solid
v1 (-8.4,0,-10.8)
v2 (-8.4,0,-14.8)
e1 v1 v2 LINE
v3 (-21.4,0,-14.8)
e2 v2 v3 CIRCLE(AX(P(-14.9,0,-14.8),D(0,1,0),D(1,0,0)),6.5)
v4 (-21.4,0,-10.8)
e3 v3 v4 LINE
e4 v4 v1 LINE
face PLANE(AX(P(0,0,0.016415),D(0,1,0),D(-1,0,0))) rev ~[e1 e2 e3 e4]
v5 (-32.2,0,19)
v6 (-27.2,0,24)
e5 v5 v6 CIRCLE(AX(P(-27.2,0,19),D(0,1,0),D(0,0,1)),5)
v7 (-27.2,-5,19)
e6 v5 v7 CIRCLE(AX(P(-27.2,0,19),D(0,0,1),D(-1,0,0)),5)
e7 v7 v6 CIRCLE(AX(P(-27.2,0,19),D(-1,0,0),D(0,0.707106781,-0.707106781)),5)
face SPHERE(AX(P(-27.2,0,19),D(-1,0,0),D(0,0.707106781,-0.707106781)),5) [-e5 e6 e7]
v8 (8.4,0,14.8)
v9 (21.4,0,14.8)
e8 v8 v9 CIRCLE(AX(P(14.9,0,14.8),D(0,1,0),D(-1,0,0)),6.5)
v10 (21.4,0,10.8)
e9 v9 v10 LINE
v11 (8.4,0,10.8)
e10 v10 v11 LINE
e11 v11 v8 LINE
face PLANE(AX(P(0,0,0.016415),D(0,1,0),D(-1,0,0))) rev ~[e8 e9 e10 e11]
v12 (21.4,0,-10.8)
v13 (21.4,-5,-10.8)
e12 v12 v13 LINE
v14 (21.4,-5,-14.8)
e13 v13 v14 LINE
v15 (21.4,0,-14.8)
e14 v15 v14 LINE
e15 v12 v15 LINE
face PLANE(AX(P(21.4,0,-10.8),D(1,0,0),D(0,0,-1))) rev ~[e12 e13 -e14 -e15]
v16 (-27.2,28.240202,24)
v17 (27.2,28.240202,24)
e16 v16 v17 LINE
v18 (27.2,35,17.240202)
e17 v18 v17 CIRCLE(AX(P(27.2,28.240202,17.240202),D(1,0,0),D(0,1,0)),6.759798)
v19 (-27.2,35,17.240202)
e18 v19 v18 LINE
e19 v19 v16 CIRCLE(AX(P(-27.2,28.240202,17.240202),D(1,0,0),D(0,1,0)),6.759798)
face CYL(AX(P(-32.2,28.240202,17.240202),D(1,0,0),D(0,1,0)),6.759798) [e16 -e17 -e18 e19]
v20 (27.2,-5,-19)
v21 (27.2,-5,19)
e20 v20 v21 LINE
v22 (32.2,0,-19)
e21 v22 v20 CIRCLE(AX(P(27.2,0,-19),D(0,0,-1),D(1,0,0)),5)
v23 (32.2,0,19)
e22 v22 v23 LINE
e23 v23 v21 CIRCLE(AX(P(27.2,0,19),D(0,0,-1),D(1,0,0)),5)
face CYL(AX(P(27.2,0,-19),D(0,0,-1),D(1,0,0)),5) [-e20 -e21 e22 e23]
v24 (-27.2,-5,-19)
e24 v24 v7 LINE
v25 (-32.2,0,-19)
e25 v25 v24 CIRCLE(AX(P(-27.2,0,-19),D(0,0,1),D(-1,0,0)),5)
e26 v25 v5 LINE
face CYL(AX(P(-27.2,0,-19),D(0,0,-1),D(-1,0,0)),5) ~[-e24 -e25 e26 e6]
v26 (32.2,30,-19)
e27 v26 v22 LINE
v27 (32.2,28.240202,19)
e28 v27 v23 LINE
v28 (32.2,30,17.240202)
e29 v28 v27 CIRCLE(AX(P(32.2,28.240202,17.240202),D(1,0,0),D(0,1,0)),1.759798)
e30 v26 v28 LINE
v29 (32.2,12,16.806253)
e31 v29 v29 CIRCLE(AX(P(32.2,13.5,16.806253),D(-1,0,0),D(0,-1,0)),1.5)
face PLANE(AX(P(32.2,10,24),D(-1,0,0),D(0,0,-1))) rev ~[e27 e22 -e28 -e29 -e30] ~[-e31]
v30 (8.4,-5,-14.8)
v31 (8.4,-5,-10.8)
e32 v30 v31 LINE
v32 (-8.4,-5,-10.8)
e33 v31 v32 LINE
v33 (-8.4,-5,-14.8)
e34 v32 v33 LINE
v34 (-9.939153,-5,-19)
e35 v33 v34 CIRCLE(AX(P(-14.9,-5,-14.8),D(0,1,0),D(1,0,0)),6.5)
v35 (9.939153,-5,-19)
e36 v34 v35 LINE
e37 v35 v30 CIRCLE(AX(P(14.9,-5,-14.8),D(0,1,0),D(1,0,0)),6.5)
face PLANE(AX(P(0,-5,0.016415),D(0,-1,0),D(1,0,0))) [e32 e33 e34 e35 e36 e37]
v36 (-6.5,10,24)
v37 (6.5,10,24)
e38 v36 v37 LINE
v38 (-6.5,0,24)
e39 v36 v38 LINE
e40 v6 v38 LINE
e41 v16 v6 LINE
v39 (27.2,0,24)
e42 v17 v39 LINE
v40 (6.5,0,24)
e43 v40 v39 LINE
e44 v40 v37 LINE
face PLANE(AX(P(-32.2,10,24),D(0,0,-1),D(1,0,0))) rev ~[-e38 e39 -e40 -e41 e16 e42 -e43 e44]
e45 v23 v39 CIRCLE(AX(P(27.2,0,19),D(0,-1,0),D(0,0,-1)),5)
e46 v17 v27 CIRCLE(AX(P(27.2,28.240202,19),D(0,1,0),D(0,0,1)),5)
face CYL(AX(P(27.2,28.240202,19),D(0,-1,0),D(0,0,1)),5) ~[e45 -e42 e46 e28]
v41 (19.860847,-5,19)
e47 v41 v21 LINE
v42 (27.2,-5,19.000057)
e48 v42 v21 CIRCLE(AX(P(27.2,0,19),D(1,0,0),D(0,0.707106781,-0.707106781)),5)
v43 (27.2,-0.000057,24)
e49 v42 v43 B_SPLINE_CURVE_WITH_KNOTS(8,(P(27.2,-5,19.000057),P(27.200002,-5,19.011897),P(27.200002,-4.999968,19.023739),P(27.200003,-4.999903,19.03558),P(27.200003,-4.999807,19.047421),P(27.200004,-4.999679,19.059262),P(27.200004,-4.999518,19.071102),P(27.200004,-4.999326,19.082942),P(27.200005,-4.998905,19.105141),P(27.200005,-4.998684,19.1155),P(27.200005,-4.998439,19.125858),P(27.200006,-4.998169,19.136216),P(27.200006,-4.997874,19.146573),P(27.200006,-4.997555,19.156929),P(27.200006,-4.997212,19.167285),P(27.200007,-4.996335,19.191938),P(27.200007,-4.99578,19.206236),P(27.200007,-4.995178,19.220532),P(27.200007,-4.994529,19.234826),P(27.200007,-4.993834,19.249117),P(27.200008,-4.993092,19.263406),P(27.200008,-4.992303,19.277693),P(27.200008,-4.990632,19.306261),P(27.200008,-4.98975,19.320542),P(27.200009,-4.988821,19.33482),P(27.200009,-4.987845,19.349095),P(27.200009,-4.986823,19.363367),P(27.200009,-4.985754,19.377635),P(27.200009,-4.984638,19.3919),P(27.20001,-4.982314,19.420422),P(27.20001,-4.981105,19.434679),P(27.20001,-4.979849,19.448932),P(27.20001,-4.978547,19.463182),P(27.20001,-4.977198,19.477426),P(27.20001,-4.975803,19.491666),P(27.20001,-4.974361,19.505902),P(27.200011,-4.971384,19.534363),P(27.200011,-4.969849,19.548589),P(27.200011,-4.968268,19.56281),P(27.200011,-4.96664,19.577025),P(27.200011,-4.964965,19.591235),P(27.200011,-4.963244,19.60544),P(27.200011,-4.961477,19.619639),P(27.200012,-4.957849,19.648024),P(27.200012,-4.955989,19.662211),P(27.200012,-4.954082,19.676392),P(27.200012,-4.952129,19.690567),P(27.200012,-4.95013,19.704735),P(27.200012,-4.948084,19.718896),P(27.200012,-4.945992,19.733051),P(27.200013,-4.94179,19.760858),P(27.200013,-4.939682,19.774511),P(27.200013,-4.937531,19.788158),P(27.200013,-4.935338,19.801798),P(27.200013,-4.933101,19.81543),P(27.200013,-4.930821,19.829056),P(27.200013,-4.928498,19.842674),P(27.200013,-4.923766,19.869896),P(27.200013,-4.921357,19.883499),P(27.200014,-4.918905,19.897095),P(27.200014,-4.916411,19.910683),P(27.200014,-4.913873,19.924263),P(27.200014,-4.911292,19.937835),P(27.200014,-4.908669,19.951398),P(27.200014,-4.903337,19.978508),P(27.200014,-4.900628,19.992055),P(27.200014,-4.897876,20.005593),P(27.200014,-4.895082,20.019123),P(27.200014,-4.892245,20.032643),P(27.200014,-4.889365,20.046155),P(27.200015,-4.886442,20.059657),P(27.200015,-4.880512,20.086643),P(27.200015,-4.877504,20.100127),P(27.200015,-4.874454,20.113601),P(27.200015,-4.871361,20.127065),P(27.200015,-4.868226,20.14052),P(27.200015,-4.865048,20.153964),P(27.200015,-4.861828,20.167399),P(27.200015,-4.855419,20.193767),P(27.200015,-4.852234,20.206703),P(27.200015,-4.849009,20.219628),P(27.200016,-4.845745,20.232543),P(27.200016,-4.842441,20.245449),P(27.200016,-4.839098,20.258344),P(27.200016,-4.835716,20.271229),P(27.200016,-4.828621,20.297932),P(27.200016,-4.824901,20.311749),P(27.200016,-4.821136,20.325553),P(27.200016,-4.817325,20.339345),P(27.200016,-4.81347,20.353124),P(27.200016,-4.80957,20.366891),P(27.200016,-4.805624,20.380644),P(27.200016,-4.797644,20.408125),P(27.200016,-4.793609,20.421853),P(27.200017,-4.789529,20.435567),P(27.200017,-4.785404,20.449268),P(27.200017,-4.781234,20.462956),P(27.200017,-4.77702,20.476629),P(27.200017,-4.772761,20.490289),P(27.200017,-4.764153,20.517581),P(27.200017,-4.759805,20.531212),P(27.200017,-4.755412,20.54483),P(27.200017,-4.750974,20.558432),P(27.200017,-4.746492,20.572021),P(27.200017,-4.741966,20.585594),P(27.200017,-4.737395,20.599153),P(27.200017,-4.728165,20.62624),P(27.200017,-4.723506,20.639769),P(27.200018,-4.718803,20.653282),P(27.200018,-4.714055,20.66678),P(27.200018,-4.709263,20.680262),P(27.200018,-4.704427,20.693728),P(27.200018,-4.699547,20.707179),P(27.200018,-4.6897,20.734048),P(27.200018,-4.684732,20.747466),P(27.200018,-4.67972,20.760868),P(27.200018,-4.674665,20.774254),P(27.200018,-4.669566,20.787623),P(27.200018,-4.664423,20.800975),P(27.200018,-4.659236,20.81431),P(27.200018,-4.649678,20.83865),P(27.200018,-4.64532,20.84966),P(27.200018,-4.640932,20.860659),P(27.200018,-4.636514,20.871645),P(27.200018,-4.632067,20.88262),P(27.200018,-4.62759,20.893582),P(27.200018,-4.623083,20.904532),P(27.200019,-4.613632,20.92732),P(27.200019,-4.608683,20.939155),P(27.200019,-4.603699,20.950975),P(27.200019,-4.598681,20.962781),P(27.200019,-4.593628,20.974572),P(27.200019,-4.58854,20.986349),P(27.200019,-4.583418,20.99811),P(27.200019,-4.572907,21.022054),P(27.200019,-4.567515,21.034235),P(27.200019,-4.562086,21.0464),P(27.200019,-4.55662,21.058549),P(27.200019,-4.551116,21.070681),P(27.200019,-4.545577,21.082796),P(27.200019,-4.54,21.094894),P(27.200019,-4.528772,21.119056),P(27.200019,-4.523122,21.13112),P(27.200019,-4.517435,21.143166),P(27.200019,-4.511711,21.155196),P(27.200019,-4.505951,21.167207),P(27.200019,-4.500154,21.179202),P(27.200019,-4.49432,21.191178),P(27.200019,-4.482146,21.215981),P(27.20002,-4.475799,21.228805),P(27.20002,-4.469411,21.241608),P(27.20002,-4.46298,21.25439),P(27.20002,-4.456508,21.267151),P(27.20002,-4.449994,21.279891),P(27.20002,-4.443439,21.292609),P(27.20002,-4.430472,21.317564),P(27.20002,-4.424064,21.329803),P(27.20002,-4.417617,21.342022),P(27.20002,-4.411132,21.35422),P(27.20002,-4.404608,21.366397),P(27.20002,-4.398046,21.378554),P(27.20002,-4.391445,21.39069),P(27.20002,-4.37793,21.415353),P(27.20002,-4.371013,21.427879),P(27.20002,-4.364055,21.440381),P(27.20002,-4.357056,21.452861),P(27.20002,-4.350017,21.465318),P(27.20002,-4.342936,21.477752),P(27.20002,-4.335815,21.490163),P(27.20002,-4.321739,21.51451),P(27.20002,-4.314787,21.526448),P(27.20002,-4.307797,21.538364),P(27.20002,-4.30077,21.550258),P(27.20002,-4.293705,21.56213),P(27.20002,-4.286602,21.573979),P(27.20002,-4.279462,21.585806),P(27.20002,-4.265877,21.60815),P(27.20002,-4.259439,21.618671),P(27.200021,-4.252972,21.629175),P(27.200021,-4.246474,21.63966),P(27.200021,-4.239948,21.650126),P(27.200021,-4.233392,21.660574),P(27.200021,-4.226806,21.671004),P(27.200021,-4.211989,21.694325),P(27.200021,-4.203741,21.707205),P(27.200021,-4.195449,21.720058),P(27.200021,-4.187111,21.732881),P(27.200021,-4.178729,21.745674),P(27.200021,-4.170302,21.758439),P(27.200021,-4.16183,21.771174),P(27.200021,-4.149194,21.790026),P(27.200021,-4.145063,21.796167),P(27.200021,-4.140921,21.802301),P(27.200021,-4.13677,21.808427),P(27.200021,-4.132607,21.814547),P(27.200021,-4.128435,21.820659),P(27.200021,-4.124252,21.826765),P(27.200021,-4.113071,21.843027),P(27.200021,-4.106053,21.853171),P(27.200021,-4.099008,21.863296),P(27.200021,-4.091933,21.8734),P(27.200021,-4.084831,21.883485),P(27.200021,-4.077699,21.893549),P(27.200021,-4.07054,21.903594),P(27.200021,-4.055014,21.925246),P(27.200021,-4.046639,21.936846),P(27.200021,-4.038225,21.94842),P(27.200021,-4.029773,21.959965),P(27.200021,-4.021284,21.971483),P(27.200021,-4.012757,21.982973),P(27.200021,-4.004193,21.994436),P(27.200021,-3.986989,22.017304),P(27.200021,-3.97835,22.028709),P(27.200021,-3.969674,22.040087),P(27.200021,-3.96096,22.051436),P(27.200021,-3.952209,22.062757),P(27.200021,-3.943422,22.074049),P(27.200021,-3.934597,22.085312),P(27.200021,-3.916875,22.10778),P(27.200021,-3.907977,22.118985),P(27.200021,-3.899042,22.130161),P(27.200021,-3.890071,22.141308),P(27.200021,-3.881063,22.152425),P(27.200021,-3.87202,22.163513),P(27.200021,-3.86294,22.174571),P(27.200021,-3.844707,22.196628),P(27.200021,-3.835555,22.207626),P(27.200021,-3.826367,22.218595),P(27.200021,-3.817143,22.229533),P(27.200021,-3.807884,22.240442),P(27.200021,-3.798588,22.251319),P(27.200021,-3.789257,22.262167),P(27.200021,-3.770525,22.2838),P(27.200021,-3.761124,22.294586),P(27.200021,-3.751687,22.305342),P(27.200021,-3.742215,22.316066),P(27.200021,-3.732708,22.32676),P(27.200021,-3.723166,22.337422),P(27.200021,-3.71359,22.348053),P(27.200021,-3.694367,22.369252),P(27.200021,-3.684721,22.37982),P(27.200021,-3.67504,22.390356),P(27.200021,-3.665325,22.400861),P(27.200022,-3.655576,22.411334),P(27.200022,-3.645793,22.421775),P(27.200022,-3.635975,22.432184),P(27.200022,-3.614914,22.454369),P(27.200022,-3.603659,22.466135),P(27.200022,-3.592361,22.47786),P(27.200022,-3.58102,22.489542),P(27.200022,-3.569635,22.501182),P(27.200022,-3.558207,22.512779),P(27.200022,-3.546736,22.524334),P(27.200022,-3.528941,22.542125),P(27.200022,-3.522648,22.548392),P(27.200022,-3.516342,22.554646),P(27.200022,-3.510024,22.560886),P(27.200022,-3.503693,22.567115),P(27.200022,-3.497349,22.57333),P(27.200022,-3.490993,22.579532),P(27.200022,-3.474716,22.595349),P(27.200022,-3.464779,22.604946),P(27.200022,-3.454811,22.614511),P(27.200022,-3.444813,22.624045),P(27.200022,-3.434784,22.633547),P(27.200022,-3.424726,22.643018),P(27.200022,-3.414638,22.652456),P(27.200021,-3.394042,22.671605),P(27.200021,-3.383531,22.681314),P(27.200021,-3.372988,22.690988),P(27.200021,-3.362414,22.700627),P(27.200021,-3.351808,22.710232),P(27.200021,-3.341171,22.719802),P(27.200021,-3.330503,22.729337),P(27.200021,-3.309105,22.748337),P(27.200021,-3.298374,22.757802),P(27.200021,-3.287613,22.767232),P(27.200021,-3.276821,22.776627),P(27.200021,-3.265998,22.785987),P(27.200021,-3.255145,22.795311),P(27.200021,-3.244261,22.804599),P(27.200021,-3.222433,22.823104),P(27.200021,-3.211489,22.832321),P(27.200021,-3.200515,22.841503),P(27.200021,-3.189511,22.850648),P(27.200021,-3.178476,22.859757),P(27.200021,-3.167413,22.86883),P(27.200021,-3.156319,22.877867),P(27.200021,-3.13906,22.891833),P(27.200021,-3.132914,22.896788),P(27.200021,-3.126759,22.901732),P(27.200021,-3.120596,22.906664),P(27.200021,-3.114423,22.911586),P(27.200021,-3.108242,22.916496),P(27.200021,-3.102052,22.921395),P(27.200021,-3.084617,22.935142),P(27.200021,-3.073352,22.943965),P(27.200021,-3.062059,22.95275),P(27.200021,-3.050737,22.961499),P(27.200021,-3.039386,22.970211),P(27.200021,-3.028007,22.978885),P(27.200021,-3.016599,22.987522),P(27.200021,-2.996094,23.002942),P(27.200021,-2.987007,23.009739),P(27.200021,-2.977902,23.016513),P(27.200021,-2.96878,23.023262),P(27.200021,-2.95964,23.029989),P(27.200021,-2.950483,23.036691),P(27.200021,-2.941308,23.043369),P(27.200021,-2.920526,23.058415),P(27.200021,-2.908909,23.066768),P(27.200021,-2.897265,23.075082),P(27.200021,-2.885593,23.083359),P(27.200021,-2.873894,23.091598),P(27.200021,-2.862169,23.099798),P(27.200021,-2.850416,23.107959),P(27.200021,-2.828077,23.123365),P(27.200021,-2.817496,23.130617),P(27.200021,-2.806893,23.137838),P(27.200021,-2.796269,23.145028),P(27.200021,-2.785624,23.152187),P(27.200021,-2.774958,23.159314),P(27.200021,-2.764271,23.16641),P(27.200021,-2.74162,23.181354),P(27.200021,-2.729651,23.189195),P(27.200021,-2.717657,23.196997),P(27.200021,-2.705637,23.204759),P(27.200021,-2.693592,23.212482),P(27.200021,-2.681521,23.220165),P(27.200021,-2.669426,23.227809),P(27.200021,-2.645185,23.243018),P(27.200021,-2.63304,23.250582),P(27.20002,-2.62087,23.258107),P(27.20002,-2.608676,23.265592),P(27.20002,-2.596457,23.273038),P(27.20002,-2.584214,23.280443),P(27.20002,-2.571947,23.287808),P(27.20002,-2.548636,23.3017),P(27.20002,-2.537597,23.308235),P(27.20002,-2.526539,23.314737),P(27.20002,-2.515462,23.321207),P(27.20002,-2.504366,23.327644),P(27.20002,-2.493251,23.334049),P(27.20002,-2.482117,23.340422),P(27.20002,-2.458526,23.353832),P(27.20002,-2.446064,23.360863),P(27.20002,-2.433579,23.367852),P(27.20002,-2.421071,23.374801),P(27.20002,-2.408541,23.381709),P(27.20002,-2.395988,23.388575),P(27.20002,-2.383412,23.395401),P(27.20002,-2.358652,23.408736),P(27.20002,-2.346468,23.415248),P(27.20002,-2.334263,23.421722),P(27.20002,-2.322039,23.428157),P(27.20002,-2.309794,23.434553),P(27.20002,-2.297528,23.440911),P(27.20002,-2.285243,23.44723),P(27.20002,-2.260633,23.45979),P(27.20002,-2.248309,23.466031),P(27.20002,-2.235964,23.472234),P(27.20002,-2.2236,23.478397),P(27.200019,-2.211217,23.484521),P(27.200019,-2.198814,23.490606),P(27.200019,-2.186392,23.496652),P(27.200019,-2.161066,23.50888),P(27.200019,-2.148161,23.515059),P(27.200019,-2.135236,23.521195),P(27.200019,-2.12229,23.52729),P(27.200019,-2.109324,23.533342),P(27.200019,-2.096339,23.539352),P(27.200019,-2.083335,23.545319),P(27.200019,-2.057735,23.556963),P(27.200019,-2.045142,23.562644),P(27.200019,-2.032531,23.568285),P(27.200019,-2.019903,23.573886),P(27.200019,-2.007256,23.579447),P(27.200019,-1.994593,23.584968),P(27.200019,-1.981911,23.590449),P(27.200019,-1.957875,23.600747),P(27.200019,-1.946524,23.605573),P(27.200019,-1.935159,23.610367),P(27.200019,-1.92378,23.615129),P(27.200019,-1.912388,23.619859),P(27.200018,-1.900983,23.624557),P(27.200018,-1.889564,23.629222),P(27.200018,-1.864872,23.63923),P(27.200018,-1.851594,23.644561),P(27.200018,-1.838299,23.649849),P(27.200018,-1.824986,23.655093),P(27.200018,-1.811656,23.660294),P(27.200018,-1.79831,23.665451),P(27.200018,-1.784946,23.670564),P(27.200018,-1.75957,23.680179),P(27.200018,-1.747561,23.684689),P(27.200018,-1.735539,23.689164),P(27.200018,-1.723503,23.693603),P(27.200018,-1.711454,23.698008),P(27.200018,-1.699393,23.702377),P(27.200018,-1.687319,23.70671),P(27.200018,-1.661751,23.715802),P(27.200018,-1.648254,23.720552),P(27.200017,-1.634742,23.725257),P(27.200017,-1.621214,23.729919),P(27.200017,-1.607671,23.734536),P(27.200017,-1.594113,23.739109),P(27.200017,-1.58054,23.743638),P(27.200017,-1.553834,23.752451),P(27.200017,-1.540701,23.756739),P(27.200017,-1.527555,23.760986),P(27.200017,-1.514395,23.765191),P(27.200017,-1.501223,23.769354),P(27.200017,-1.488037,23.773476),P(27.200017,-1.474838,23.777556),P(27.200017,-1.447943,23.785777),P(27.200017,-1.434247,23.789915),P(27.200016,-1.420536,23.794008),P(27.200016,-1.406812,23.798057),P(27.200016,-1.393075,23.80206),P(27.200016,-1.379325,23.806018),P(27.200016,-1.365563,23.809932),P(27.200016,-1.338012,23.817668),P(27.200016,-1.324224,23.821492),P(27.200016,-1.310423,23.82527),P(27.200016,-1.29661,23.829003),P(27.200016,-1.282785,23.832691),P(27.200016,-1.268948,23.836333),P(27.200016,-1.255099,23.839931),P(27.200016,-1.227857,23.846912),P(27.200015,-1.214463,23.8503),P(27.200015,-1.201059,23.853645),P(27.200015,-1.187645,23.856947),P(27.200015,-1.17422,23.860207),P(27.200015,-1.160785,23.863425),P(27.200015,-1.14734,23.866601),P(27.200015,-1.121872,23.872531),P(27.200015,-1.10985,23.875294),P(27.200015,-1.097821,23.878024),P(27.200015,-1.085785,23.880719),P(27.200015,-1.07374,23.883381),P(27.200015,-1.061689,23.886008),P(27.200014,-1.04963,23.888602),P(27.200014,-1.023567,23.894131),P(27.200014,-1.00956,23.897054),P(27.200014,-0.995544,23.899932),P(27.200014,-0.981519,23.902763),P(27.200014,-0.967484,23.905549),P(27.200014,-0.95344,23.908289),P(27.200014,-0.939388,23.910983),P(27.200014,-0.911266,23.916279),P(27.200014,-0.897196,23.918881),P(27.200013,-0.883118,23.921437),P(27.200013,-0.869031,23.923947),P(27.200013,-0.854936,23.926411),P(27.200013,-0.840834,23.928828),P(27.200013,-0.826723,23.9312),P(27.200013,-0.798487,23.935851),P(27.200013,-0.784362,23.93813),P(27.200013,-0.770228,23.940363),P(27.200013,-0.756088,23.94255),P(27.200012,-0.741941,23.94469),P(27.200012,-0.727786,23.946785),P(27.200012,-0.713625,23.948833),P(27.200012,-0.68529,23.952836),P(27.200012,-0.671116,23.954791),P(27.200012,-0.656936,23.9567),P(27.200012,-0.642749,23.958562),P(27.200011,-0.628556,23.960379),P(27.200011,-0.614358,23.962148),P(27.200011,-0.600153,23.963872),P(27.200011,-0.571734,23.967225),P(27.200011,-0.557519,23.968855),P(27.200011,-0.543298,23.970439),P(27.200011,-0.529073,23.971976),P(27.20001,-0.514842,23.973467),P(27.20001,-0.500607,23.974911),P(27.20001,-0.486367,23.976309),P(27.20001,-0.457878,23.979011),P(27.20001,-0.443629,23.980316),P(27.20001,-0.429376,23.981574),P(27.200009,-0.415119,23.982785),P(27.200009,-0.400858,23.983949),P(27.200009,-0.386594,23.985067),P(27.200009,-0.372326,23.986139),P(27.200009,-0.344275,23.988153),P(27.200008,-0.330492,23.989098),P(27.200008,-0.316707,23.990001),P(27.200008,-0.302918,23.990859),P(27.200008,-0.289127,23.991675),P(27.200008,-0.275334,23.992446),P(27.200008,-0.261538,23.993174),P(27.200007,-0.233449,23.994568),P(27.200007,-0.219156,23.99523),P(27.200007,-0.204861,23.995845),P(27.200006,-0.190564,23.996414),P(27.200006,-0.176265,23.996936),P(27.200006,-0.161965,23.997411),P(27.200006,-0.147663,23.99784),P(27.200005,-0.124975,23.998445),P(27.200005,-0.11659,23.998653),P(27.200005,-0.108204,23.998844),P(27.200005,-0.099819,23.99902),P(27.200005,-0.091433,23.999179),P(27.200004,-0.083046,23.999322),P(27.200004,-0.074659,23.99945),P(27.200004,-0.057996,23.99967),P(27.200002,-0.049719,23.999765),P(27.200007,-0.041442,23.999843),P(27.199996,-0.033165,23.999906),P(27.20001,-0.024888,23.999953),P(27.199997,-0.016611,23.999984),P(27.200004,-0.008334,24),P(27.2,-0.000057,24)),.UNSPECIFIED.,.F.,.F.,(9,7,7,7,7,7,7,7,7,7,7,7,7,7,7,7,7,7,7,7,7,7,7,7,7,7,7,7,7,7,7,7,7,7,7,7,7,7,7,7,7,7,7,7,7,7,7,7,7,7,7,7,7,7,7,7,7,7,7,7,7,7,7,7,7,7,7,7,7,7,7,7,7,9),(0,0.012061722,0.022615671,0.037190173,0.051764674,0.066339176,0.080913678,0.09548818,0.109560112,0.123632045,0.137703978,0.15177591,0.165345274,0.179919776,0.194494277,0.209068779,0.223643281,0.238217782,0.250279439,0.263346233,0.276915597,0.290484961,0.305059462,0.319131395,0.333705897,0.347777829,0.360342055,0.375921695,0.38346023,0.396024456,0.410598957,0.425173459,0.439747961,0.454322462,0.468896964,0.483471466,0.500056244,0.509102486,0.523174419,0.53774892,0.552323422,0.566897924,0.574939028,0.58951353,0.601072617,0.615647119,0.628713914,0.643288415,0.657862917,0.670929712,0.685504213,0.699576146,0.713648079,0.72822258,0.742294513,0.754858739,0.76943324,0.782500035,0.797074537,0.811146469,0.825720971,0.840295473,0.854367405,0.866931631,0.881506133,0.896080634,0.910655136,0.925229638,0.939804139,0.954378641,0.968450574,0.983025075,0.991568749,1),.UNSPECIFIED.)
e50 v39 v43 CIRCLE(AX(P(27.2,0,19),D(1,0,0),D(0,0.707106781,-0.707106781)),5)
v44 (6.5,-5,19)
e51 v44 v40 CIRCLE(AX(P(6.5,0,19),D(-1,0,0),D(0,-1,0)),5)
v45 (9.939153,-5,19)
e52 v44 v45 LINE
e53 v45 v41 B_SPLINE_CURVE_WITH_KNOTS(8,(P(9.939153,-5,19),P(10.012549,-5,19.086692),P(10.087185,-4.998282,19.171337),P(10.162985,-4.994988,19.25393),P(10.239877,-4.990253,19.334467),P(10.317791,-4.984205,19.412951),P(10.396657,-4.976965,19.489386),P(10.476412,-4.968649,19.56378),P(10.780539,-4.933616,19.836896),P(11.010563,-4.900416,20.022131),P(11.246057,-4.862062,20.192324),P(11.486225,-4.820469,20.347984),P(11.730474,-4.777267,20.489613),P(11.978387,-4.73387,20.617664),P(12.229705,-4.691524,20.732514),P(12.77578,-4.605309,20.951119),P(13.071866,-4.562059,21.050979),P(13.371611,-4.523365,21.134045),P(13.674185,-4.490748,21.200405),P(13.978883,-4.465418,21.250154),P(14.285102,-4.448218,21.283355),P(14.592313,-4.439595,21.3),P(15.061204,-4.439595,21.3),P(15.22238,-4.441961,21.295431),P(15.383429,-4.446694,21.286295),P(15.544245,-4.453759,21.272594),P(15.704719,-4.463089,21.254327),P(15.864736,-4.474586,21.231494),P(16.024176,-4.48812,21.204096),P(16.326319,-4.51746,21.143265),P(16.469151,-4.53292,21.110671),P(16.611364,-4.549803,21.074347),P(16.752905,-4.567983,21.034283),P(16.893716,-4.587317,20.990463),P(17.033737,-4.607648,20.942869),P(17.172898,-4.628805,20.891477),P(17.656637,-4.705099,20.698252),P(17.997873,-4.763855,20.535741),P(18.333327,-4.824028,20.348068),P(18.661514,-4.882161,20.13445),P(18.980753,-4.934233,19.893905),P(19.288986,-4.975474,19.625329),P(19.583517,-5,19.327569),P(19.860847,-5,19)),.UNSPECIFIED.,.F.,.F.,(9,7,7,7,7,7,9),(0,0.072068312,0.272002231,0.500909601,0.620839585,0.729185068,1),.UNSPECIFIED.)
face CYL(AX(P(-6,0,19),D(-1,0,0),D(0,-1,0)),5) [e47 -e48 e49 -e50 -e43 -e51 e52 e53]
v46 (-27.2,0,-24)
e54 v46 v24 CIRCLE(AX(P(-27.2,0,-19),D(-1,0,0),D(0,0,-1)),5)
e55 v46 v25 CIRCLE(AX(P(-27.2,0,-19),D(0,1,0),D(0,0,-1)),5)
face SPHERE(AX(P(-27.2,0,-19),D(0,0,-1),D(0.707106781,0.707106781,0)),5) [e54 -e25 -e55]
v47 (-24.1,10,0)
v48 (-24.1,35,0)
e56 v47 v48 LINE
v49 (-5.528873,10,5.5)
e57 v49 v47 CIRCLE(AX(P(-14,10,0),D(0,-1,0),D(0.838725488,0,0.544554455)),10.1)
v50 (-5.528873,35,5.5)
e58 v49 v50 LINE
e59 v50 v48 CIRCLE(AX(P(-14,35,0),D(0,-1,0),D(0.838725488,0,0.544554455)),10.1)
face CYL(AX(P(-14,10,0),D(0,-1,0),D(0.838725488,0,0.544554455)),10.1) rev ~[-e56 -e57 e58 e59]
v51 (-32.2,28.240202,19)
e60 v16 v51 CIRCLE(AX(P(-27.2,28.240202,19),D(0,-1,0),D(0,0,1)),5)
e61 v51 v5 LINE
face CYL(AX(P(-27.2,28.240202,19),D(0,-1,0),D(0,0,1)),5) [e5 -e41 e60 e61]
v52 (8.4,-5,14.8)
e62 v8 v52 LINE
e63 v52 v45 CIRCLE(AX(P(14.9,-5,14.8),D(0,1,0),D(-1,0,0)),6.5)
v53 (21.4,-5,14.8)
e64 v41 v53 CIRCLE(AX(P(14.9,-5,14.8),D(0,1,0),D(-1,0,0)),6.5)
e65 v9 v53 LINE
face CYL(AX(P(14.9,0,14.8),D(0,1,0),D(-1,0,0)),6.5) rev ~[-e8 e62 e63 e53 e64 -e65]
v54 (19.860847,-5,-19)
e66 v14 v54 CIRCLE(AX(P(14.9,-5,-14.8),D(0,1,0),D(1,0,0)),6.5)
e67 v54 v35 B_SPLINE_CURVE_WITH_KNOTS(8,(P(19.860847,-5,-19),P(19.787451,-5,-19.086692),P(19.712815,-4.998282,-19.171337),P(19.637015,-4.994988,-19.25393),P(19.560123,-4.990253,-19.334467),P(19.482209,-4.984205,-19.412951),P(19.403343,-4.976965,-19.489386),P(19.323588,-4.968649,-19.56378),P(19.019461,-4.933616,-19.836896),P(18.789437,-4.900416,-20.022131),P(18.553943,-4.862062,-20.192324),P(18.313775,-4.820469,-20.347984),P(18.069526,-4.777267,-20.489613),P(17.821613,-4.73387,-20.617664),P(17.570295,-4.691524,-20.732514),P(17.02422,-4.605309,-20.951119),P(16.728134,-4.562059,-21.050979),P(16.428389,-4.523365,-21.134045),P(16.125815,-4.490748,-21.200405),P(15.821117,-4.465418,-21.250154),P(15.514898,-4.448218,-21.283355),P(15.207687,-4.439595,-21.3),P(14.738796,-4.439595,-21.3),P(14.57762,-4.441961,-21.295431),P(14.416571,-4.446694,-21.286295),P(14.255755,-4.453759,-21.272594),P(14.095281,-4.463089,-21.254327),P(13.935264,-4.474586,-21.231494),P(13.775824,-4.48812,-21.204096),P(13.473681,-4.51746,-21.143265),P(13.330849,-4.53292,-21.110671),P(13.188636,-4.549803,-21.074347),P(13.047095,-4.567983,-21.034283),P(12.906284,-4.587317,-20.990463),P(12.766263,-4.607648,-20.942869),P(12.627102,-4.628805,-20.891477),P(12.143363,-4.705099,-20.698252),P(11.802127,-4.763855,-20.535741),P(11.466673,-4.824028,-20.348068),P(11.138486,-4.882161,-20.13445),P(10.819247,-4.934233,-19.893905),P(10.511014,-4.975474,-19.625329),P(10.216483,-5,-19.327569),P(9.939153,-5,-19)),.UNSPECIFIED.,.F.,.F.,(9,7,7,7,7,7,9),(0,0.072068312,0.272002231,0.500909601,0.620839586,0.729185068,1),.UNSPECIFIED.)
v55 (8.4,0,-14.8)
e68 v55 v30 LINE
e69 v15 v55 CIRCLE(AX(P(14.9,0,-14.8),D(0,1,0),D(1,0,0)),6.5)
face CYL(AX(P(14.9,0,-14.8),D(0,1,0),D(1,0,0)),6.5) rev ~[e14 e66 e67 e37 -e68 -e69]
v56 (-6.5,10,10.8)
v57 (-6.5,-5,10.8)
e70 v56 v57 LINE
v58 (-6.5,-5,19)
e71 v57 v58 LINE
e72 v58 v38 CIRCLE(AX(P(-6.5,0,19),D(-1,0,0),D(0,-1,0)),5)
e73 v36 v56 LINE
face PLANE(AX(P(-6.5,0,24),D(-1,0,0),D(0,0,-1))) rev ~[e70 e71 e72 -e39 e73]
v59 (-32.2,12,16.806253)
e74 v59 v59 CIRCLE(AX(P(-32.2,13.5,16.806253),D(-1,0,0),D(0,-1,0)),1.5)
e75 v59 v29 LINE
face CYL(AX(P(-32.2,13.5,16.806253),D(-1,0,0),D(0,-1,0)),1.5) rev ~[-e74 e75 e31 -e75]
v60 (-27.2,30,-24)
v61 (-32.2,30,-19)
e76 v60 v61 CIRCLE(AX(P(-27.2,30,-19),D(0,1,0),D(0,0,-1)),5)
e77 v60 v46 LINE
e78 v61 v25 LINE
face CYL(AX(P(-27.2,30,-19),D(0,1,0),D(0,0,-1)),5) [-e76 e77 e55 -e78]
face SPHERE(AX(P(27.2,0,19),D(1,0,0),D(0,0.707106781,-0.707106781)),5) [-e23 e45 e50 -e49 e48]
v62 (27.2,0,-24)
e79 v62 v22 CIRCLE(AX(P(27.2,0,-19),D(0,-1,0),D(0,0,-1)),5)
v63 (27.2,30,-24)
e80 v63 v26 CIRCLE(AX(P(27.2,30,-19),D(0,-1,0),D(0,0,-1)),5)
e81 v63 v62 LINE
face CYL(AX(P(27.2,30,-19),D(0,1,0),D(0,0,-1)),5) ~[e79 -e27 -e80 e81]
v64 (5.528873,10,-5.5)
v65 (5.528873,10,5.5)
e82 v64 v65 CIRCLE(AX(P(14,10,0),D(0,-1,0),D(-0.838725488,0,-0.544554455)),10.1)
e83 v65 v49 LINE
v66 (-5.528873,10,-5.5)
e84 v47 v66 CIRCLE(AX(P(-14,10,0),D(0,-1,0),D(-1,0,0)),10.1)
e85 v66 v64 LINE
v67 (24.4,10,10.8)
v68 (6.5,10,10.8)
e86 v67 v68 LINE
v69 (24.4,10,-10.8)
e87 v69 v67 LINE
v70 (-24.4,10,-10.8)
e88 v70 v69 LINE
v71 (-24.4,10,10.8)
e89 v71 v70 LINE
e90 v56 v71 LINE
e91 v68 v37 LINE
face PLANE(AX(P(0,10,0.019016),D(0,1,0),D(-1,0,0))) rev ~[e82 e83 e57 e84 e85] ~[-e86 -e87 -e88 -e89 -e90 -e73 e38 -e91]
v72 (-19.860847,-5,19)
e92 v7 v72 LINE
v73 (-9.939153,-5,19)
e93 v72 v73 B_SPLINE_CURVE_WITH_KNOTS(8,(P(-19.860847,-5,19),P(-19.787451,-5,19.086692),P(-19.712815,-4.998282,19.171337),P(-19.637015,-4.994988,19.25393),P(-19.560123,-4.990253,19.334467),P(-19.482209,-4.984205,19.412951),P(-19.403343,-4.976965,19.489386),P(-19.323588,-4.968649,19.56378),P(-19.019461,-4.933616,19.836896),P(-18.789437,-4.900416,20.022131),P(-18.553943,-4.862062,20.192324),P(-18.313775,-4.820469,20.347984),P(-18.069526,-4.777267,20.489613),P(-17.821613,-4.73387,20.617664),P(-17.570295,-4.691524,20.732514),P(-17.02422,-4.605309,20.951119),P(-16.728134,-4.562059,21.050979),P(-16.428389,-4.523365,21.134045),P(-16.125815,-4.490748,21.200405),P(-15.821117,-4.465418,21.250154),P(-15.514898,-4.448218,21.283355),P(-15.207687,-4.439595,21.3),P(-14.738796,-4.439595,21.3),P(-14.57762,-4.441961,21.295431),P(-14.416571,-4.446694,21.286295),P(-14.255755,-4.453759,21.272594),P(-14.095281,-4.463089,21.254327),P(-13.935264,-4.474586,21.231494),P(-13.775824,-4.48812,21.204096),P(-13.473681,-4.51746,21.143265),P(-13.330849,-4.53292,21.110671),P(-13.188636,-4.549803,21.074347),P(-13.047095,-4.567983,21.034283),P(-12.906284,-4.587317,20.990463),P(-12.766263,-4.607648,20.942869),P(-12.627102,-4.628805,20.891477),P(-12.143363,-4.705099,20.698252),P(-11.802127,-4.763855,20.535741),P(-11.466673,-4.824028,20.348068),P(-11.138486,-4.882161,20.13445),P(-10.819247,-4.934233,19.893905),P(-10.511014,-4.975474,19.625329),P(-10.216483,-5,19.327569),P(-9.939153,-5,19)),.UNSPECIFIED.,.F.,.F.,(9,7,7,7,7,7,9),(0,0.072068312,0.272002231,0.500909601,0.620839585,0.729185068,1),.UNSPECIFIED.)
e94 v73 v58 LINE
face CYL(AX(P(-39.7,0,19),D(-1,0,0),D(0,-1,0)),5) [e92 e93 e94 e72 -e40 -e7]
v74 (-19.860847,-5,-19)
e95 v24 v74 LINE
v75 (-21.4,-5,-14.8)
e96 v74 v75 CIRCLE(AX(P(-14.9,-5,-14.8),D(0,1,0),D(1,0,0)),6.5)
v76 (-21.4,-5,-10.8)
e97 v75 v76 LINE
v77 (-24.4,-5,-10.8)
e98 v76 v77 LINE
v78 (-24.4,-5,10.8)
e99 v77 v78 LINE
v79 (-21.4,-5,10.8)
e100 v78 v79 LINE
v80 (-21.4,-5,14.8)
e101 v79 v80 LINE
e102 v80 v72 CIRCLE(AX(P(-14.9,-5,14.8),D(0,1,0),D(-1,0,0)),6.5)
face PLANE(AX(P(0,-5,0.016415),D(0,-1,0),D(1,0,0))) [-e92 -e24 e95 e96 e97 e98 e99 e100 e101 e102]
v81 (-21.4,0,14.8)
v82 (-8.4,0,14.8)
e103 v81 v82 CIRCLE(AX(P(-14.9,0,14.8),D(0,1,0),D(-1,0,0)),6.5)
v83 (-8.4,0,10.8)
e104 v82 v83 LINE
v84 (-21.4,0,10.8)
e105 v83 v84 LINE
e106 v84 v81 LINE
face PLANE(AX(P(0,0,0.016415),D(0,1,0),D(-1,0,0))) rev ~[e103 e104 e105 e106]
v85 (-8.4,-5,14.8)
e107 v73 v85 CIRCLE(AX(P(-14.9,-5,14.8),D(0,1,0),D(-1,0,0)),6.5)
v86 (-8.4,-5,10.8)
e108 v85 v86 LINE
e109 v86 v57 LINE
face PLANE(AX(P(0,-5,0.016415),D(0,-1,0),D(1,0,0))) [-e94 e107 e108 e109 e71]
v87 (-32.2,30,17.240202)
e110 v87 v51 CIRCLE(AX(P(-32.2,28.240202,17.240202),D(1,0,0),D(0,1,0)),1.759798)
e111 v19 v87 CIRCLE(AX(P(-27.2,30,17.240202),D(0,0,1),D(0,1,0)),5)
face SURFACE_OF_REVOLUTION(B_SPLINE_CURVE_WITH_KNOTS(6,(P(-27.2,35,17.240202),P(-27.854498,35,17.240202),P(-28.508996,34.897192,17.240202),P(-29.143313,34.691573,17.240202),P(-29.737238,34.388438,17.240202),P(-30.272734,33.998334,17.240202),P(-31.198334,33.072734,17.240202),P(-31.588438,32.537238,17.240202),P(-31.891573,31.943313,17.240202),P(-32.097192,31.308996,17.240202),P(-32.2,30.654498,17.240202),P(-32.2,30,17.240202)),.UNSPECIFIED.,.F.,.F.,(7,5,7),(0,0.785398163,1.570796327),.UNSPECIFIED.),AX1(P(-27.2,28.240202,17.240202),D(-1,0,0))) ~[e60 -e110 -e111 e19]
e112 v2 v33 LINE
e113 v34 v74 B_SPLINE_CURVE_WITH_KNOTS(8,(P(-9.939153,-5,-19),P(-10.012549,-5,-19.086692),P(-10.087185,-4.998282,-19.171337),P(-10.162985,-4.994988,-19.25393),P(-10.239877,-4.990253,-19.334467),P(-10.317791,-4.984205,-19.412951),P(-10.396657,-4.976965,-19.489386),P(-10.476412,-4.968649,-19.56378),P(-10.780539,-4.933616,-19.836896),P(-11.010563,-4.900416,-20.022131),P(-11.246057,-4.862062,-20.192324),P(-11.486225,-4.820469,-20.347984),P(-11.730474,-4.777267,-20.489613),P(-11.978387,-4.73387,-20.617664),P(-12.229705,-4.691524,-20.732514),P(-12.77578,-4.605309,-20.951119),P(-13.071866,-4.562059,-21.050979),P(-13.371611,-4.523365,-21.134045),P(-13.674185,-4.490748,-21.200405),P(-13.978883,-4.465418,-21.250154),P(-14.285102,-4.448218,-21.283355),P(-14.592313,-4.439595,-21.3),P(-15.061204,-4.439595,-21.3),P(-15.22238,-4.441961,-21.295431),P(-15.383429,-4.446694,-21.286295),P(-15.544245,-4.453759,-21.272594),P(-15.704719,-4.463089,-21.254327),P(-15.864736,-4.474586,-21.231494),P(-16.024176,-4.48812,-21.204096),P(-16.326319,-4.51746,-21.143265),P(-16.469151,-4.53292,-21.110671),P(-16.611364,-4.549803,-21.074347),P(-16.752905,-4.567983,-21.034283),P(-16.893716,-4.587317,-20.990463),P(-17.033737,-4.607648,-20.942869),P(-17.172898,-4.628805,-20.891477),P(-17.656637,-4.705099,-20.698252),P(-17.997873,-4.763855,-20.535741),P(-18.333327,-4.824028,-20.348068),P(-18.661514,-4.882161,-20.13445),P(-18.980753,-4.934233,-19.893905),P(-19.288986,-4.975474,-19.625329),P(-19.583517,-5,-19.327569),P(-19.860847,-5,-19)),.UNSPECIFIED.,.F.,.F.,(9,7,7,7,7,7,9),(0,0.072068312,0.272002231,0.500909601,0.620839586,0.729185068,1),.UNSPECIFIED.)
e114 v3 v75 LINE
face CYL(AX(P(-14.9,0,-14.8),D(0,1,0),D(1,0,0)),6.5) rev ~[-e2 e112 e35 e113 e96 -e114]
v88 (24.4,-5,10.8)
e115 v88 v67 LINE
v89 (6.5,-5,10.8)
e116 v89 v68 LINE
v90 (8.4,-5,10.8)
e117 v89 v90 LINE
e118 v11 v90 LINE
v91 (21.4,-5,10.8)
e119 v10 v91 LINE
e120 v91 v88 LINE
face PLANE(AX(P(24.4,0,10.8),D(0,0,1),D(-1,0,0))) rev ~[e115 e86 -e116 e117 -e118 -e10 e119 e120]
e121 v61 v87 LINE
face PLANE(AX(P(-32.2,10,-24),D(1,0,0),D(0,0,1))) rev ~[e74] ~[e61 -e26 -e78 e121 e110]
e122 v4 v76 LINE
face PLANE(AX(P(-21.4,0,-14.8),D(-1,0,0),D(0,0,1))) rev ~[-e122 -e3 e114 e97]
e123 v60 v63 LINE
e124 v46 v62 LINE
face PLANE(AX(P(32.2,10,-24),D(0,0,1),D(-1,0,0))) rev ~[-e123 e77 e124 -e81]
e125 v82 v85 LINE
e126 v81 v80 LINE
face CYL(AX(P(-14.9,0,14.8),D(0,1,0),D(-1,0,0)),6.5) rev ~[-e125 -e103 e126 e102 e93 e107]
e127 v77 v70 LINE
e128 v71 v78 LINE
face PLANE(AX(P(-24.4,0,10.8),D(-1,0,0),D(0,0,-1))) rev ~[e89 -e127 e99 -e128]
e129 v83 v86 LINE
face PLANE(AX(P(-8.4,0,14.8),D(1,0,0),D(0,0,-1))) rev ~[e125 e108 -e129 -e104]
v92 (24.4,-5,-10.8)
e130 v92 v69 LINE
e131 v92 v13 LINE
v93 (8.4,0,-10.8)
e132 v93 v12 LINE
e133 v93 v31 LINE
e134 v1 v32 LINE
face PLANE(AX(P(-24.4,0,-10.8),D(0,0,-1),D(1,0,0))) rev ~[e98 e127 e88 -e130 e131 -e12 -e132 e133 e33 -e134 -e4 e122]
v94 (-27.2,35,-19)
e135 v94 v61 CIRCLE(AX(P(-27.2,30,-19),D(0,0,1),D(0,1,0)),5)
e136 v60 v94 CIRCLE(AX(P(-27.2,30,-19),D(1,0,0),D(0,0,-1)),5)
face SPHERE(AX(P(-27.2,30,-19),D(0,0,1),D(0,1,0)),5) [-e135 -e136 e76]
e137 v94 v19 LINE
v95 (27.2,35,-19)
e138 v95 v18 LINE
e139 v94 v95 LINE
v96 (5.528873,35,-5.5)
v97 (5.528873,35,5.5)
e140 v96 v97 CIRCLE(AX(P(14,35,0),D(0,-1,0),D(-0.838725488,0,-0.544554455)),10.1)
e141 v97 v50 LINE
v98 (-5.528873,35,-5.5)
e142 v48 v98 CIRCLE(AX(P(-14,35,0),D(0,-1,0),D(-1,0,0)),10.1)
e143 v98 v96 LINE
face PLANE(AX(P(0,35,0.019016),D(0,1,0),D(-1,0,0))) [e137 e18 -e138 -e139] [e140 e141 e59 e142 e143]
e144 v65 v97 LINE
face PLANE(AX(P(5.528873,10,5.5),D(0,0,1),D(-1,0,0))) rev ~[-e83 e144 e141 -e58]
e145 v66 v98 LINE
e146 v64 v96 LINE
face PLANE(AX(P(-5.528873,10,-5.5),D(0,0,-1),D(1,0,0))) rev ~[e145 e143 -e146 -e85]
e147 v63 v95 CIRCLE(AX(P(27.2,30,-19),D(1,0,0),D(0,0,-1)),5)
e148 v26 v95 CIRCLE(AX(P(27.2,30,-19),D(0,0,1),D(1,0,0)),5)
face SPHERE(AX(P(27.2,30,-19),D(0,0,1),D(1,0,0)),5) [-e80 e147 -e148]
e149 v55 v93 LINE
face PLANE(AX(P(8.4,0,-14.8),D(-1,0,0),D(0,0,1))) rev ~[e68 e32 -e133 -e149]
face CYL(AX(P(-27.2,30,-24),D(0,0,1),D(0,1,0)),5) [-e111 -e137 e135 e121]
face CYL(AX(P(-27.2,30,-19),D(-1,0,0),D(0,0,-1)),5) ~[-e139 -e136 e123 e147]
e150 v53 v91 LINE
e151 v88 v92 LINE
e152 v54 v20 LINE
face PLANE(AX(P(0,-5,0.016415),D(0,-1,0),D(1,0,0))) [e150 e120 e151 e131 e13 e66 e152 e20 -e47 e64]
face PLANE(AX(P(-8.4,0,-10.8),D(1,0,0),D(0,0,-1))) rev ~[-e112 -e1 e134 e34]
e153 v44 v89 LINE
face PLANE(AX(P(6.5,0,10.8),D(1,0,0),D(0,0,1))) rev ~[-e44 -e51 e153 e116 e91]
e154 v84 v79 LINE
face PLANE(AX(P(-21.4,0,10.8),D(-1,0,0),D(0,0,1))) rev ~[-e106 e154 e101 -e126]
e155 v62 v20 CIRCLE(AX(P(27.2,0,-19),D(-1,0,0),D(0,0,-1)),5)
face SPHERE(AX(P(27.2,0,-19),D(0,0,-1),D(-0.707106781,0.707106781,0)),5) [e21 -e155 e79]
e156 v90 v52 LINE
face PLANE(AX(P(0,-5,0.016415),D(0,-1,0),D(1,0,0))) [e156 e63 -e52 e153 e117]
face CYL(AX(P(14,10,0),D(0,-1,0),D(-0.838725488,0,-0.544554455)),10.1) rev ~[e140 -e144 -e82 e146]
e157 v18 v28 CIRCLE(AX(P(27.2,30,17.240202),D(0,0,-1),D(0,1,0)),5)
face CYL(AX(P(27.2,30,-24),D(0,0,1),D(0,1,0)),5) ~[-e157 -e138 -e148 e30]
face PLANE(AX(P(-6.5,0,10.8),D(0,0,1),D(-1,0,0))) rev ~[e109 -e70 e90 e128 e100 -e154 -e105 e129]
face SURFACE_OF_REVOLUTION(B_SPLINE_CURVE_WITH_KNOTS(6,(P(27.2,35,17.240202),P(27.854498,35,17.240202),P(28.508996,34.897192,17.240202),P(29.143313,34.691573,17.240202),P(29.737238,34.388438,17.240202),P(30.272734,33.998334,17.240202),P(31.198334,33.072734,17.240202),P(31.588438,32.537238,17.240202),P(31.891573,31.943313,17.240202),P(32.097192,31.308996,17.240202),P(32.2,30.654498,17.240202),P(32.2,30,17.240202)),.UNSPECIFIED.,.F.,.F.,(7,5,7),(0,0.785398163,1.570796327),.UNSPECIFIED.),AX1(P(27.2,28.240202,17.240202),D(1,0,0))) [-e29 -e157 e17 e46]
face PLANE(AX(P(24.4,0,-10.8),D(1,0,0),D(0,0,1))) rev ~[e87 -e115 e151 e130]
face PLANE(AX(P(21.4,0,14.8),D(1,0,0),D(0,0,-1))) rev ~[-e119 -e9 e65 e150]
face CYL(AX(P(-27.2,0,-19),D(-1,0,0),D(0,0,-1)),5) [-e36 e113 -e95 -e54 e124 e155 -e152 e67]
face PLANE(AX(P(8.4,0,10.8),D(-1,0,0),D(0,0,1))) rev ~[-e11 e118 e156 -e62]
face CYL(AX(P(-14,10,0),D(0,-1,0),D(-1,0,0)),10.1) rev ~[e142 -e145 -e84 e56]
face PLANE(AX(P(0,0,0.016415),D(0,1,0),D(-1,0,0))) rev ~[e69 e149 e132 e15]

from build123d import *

# Parameters (mm, degrees)
F1_DEPTH      = 5
F3_DEPTH      = 10
F5_DEPTH      = 25
F6_R          = 1.5
F7_DEPTH      = 69.4
F8_R          = 6.7597979746
F9_R          = 5
F10_R         = 5
F11_T1_DEPTH  = 45.7
F11_T3_DEPTH  = 45.7
F12_T1_DEPTH  = 54.4
F12_T3_DEPTH  = 30
F12_T5_DEPTH  = 38
F12_S9_W      = 5
F12_S9_H      = 5
F12_T10_DEPTH = 5
F12_S15_W     = 5
F12_S15_H     = 5
F12_T16_DEPTH = 5
F12_S21_W     = 5
F12_S21_H     = 5
F12_T22_DEPTH = 5
F12_S27_W     = 5
F12_S27_H     = 5
F12_T28_DEPTH = 5
F12_T32_ANGLE = 90
F12_T34_ANGLE = 90


# Not quite as in the source:
# - a fillet or chamfer that OpenCascade refuses, or shapes differently, is made with other operations: its cross-section is extruded or revolved along the edge and cut away or added


with BuildPart() as f1:
    # F0 (on Front) → F1 (new body)
    with BuildSketch(Plane.XZ):
        with BuildLine():
            Line((32.2, -24), (32.2, 24))
            Line((32.2, 24), (6.5, 24))
            Line((6.5, 24), (6.5, 10.8))
            Line((6.5, 10.8), (8.4, 10.8))
            Line((8.4, 10.8), (8.4, 14.8))
            ThreePointArc((8.4, 14.8), (14.9, 21.3), (21.4, 14.8))
            Line((21.4, 14.8), (21.4, 10.8))
            Line((21.4, 10.8), (24.4, 10.8))
            Line((24.4, 10.8), (24.4, -10.8))
            Line((24.4, -10.8), (21.4, -10.8))
            Line((21.4, -10.8), (21.4, -14.8))
            ThreePointArc((21.4, -14.8), (14.9, -21.3), (8.4, -14.8))
            Line((8.4, -14.8), (8.4, -10.8))
            Line((8.4, -10.8), (-8.4, -10.8))
            Line((-8.4, -10.8), (-8.4, -14.8))
            ThreePointArc((-8.4, -14.8), (-14.9, -21.3), (-21.4, -14.8))
            Line((-21.4, -14.8), (-21.4, -10.8))
            Line((-21.4, -10.8), (-24.4, -10.8))
            Line((-24.4, -10.8), (-24.4, 10.8))
            Line((-24.4, 10.8), (-21.4, 10.8))
            Line((-21.4, 10.8), (-21.4, 14.8))
            ThreePointArc((-21.4, 14.8), (-14.9, 21.3), (-8.4, 14.8))
            Line((-8.4, 14.8), (-8.4, 10.8))
            Line((-8.4, 10.8), (-6.5, 10.8))
            Line((-6.5, 10.8), (-6.5, 24))
            Line((-6.5, 24), (-32.2, 24))
            Line((-32.2, 24), (-32.2, -24))
            Line((-32.2, -24), (32.2, -24))
        make_face()
    extrude(amount=F1_DEPTH)

    # F2 (on face) → F3 (join)
    with BuildSketch(Plane(origin=(0, 0, 0), x_dir=(-1, 0, 0), z_dir=(0, 1, 0))):
        with BuildLine():
            Line((24.4, 10.8), (24.4, -10.8))
            Line((24.4, -10.8), (21.4, -10.8))
            Line((21.4, -10.8), (21.4, -14.8))
            ThreePointArc((21.4, -14.8), (14.9, -21.3), (8.4, -14.8))
            Line((8.4, -14.8), (8.4, -10.8))
            Line((8.4, -10.8), (-8.4, -10.8))
            Line((-8.4, -10.8), (-8.4, -14.8))
            ThreePointArc((-8.4, -14.8), (-14.9, -21.3), (-21.4, -14.8))
            Line((-21.4, -14.8), (-21.4, -10.8))
            Line((-21.4, -10.8), (-24.4, -10.8))
            Line((-24.4, -10.8), (-24.4, 10.8))
            Line((-24.4, 10.8), (-21.4, 10.8))
            Line((-21.4, 10.8), (-21.4, 14.8))
            ThreePointArc((-21.4, 14.8), (-14.9, 21.3), (-8.4, 14.8))
            Line((-8.4, 14.8), (-8.4, 10.8))
            Line((-8.4, 10.8), (-6.5, 10.8))
            Line((-6.5, 10.8), (-6.5, 24))
            Line((-6.5, 24), (-32.2, 24))
            Line((-32.2, 24), (-32.2, -24))
            Line((-32.2, -24), (32.2, -24))
            Line((32.2, -24), (32.2, 24))
            Line((32.2, 24), (6.5, 24))
            Line((6.5, 24), (6.5, 10.8))
            Line((6.5, 10.8), (8.4, 10.8))
            Line((8.4, 10.8), (8.4, 14.8))
            ThreePointArc((8.4, 14.8), (14.9, 21.3), (21.4, 14.8))
            Line((21.4, 14.8), (21.4, 10.8))
            Line((21.4, 10.8), (24.4, 10.8))
        make_face()
        with BuildLine():
            Line((21.4, -14.8), (21.4, -10.8))
            Line((21.4, -10.8), (8.4, -10.8))
            Line((8.4, -10.8), (8.4, -14.8))
            ThreePointArc((8.4, -14.8), (14.9, -21.3), (21.4, -14.8))
        make_face()
        with BuildLine():
            Line((-8.4, -14.8), (-8.4, -10.8))
            Line((-8.4, -10.8), (-21.4, -10.8))
            Line((-21.4, -10.8), (-21.4, -14.8))
            ThreePointArc((-21.4, -14.8), (-14.9, -21.3), (-8.4, -14.8))
        make_face()
        with BuildLine():
            Line((8.4, 10.8), (21.4, 10.8))
            Line((21.4, 10.8), (21.4, 14.8))
            ThreePointArc((21.4, 14.8), (14.9, 21.3), (8.4, 14.8))
            Line((8.4, 14.8), (8.4, 10.8))
        make_face()
        with BuildLine():
            Line((-21.4, 10.8), (-8.4, 10.8))
            Line((-8.4, 10.8), (-8.4, 14.8))
            ThreePointArc((-8.4, 14.8), (-14.9, 21.3), (-21.4, 14.8))
            Line((-21.4, 14.8), (-21.4, 10.8))
        make_face()
    extrude(amount=F3_DEPTH)

    # F4 (on face) → F5 (join)
    with BuildSketch(Plane(origin=(0, 10, 0), x_dir=(-1, 0, 0), z_dir=(0, 1, 0))):
        Polygon((32.2, -24), (32.2, 24), (6.5, 24), (6.5, 10.8), (24.4, 10.8), (24.4, -10.8), (-24.4, -10.8), (-24.4, 10.8), (-6.5, 10.8), (-6.5, 24), (-32.2, 24), (-32.2, -24), align=None)
        Polygon((6.5, 10.8), (6.5, 24), (-6.5, 24), (-6.5, 10.8), (-24.4, 10.8), (-24.4, -10.8), (24.4, -10.8), (24.4, 10.8), align=None)
        with BuildLine():
            ThreePointArc((5.5288725662, 5.5), (16.8680666762, 9.6842239514), (24.1, 0))
            ThreePointArc((24.1, 0), (16.8680666762, -9.6842239514), (5.5288725662, -5.5))
            Line((5.5288725662, -5.5), (0, -5.5))
            Line((0, -5.5), (-5.5288725662, -5.5))
            ThreePointArc((-5.5288725662, -5.5), (-24.1, 0), (-5.5288725662, 5.5))
            Line((-5.5288725662, 5.5), (0, 5.5))
            Line((0, 5.5), (5.5288725662, 5.5))
        make_face(mode=Mode.SUBTRACT)
    extrude(amount=F5_DEPTH)

    # F6 (on face) → F7 (cut)
    with BuildSketch(Plane(origin=(-32.2, 0, 0), x_dir=(0, -1, 0), z_dir=(-1, 0, 0))):
        with Locations((-13.5, 16.806252715)):
            Circle(F6_R)
    extrude(amount=-F7_DEPTH, mode=Mode.SUBTRACT)

    # F8
    f8_edges = [f1.edges().sort_by_distance(p)[0] for p in [
        (0, 35, 24),
    ]]
    fillet(f8_edges, radius=F8_R)

    # F9
    f9_edges = [f1.edges().sort_by_distance(p)[0] for p in [
        (32.2, 33.020101, 22.020101),
        (32.2, 35, -3.379899),
    ]]
    fillet(f9_edges, radius=F9_R)

    # F10
    f10_edges = [f1.edges().sort_by_distance(p)[0] for p in [
        (-32.2, 35, -3.379899),
    ]]
    fillet(f10_edges, radius=F10_R)

    # F11: fillet of radius 5 on 2 edges, made by hand

    # F11_s2 → F11_t1 (cut)
    with BuildSketch(Plane.YZ.offset(-39.7)):
        with BuildLine():
            ThreePointArc((-5, 19), (-3.5355339059, 22.5355339059), (0, 24))
            Line((0, 24), (-5, 24))
            Line((-5, 24), (-5, 19))
        make_face()
    extrude(amount=F11_T1_DEPTH, mode=Mode.SUBTRACT)

    # F11_s4 → F11_t3 (cut)
    with BuildSketch(Plane.YZ.offset(-6)):
        with BuildLine():
            ThreePointArc((-5, 19), (-3.5355339059, 22.5355339059), (0, 24))
            Line((0, 24), (-5, 24))
            Line((-5, 24), (-5, 19))
        make_face()
    extrude(amount=F11_T3_DEPTH, mode=Mode.SUBTRACT)

    # F12: fillet of radius 5 on 8 edges, made by hand

    # F12_s2 → F12_t1 (cut)
    with BuildSketch(Plane.YZ.offset(-27.2)):
        with BuildLine():
            ThreePointArc((30, -24), (33.5355339059, -22.5355339059), (35, -19))
            Line((35, -19), (35, -24))
            Line((35, -24), (30, -24))
        make_face()
        with BuildLine():
            ThreePointArc((0, -24), (-3.5355339059, -22.5355339059), (-5, -19))
            Line((-5, -19), (-5, -24))
            Line((-5, -24), (0, -24))
        make_face()
    extrude(amount=F12_T1_DEPTH, mode=Mode.SUBTRACT)

    # F12_s4 → F12_t3 (cut)
    with BuildSketch(Plane.XZ.offset(-30)):
        with BuildLine():
            ThreePointArc((-27.2, -24), (-30.7355339059, -22.5355339059), (-32.2, -19))
            Line((-32.2, -19), (-32.2, -24))
            Line((-32.2, -24), (-27.2, -24))
        make_face()
        with BuildLine():
            ThreePointArc((27.2, -24), (30.7355339059, -22.5355339059), (32.2, -19))
            Line((32.2, -19), (32.2, -24))
            Line((32.2, -24), (27.2, -24))
        make_face()
    extrude(amount=F12_T3_DEPTH, mode=Mode.SUBTRACT)

    # F12_s6 → F12_t5 (cut)
    with BuildSketch(Plane.XY.offset(-19)):
        with BuildLine():
            ThreePointArc((-32.2, 0), (-30.7355339059, -3.5355339059), (-27.2, -5))
            Line((-27.2, -5), (-32.2, -5))
            Line((-32.2, -5), (-32.2, 0))
        make_face()
        with BuildLine():
            ThreePointArc((32.2, 0), (30.7355339059, -3.5355339059), (27.2, -5))
            Line((27.2, -5), (32.2, -5))
            Line((32.2, -5), (32.2, 0))
        make_face()
    extrude(amount=F12_T5_DEPTH, mode=Mode.SUBTRACT)


with BuildPart() as f12_tool8:
    # F12_s9 → F12_t10 (new body)
    with BuildSketch(Plane.YZ.offset(27.2)):
        with Locations((-2.5, 21.5)):
            Rectangle(F12_S9_W, F12_S9_H)
    extrude(amount=F12_T10_DEPTH)

    # F12_s11 → F12_t12 (revolve, cut)
    with BuildSketch(Plane(origin=(27.2, 0, 19), x_dir=(0, 0.7071067812, -0.7071067812), z_dir=(0, -0.7071067812, -0.7071067812))):
        with BuildLine():
            ThreePointArc((0, -5), (5, 0), (0, 5))
            Line((0, 5), (0, -5))
        make_face()
    revolve(axis=Axis((27.2, 0, 19), (1, 0, 0)), mode=Mode.SUBTRACT)


with BuildPart() as f1_1:
    add(f1.part)

    # F12_t7: cut F12_tool8
    add(f12_tool8.part, mode=Mode.SUBTRACT)


with BuildPart() as f12_tool14:
    # F12_s15 → F12_t16 (new body)
    with BuildSketch(Plane.YZ.offset(-27.2)):
        with Locations((-2.5, 21.5)):
            Rectangle(F12_S15_W, F12_S15_H)
    extrude(amount=-F12_T16_DEPTH)

    # F12_s17 → F12_t18 (revolve, cut)
    with BuildSketch(Plane(origin=(-27.2, 0, 19), x_dir=(0, 0.7071067812, -0.7071067812), z_dir=(0, 0.7071067812, 0.7071067812))):
        with BuildLine():
            ThreePointArc((0, -5), (5, 0), (0, 5))
            Line((0, 5), (0, -5))
        make_face()
    revolve(axis=Axis((-27.2, 0, 19), (-1, 0, 0)), mode=Mode.SUBTRACT)


with BuildPart() as f1_2:
    add(f1_1.part)

    # F12_t13: cut F12_tool14
    add(f12_tool14.part, mode=Mode.SUBTRACT)


with BuildPart() as f12_tool20:
    # F12_s21 → F12_t22 (new body)
    with BuildSketch(Plane.XY.offset(-19)):
        with Locations((-29.7, -2.5)):
            Rectangle(F12_S21_W, F12_S21_H)
    extrude(amount=-F12_T22_DEPTH)

    # F12_s23 → F12_t24 (revolve, cut)
    with BuildSketch(Plane(origin=(-27.2, 0, -19), x_dir=(0.7071067812, 0.7071067812, 0), z_dir=(-0.7071067812, 0.7071067812, 0))):
        with BuildLine():
            ThreePointArc((0, -5), (5, 0), (0, 5))
            Line((0, 5), (0, -5))
        make_face()
    revolve(axis=Axis((-27.2, 0, -19), (0, 0, -1)), mode=Mode.SUBTRACT)


with BuildPart() as f1_3:
    add(f1_2.part)

    # F12_t19: cut F12_tool20
    add(f12_tool20.part, mode=Mode.SUBTRACT)


with BuildPart() as f12_tool26:
    # F12_s27 → F12_t28 (new body)
    with BuildSketch(Plane.XY.offset(-19)):
        with Locations((29.7, -2.5)):
            Rectangle(F12_S27_W, F12_S27_H)
    extrude(amount=-F12_T28_DEPTH)

    # F12_s29 → F12_t30 (revolve, cut)
    with BuildSketch(Plane(origin=(27.2, 0, -19), x_dir=(-0.7071067812, 0.7071067812, 0), z_dir=(-0.7071067812, -0.7071067812, 0))):
        with BuildLine():
            ThreePointArc((0, -5), (5, 0), (0, 5))
            Line((0, 5), (0, -5))
        make_face()
    revolve(axis=Axis((27.2, 0, -19), (0, 0, -1)), mode=Mode.SUBTRACT)


with BuildPart() as f1_4:
    add(f1_3.part)

    # F12_t25: cut F12_tool26
    add(f12_tool26.part, mode=Mode.SUBTRACT)

    # F12_s31 → F12_t32 (revolve, cut)
    with BuildSketch(Plane.YZ.offset(-27.2)):
        with BuildLine():
            ThreePointArc((30, -24), (33.5355339059, -22.5355339059), (35, -19))
            Line((35, -19), (35, -24))
            Line((35, -24), (30, -24))
        make_face()
    revolve(axis=Axis((-27.2, 30, -24), (0, 0, 1)), revolution_arc=F12_T32_ANGLE, mode=Mode.SUBTRACT)

    # F12_s33 → F12_t34 (revolve, cut)
    with BuildSketch(Plane.XZ.offset(-30)):
        with BuildLine():
            ThreePointArc((27.2, -24), (30.7355339059, -22.5355339059), (32.2, -19))
            Line((32.2, -19), (32.2, -24))
            Line((32.2, -24), (27.2, -24))
        make_face()
    revolve(axis=Axis((27.2, 30, -24), (0, 0, 1)), revolution_arc=F12_T34_ANGLE, mode=Mode.SUBTRACT)


solid = f1_4.part
